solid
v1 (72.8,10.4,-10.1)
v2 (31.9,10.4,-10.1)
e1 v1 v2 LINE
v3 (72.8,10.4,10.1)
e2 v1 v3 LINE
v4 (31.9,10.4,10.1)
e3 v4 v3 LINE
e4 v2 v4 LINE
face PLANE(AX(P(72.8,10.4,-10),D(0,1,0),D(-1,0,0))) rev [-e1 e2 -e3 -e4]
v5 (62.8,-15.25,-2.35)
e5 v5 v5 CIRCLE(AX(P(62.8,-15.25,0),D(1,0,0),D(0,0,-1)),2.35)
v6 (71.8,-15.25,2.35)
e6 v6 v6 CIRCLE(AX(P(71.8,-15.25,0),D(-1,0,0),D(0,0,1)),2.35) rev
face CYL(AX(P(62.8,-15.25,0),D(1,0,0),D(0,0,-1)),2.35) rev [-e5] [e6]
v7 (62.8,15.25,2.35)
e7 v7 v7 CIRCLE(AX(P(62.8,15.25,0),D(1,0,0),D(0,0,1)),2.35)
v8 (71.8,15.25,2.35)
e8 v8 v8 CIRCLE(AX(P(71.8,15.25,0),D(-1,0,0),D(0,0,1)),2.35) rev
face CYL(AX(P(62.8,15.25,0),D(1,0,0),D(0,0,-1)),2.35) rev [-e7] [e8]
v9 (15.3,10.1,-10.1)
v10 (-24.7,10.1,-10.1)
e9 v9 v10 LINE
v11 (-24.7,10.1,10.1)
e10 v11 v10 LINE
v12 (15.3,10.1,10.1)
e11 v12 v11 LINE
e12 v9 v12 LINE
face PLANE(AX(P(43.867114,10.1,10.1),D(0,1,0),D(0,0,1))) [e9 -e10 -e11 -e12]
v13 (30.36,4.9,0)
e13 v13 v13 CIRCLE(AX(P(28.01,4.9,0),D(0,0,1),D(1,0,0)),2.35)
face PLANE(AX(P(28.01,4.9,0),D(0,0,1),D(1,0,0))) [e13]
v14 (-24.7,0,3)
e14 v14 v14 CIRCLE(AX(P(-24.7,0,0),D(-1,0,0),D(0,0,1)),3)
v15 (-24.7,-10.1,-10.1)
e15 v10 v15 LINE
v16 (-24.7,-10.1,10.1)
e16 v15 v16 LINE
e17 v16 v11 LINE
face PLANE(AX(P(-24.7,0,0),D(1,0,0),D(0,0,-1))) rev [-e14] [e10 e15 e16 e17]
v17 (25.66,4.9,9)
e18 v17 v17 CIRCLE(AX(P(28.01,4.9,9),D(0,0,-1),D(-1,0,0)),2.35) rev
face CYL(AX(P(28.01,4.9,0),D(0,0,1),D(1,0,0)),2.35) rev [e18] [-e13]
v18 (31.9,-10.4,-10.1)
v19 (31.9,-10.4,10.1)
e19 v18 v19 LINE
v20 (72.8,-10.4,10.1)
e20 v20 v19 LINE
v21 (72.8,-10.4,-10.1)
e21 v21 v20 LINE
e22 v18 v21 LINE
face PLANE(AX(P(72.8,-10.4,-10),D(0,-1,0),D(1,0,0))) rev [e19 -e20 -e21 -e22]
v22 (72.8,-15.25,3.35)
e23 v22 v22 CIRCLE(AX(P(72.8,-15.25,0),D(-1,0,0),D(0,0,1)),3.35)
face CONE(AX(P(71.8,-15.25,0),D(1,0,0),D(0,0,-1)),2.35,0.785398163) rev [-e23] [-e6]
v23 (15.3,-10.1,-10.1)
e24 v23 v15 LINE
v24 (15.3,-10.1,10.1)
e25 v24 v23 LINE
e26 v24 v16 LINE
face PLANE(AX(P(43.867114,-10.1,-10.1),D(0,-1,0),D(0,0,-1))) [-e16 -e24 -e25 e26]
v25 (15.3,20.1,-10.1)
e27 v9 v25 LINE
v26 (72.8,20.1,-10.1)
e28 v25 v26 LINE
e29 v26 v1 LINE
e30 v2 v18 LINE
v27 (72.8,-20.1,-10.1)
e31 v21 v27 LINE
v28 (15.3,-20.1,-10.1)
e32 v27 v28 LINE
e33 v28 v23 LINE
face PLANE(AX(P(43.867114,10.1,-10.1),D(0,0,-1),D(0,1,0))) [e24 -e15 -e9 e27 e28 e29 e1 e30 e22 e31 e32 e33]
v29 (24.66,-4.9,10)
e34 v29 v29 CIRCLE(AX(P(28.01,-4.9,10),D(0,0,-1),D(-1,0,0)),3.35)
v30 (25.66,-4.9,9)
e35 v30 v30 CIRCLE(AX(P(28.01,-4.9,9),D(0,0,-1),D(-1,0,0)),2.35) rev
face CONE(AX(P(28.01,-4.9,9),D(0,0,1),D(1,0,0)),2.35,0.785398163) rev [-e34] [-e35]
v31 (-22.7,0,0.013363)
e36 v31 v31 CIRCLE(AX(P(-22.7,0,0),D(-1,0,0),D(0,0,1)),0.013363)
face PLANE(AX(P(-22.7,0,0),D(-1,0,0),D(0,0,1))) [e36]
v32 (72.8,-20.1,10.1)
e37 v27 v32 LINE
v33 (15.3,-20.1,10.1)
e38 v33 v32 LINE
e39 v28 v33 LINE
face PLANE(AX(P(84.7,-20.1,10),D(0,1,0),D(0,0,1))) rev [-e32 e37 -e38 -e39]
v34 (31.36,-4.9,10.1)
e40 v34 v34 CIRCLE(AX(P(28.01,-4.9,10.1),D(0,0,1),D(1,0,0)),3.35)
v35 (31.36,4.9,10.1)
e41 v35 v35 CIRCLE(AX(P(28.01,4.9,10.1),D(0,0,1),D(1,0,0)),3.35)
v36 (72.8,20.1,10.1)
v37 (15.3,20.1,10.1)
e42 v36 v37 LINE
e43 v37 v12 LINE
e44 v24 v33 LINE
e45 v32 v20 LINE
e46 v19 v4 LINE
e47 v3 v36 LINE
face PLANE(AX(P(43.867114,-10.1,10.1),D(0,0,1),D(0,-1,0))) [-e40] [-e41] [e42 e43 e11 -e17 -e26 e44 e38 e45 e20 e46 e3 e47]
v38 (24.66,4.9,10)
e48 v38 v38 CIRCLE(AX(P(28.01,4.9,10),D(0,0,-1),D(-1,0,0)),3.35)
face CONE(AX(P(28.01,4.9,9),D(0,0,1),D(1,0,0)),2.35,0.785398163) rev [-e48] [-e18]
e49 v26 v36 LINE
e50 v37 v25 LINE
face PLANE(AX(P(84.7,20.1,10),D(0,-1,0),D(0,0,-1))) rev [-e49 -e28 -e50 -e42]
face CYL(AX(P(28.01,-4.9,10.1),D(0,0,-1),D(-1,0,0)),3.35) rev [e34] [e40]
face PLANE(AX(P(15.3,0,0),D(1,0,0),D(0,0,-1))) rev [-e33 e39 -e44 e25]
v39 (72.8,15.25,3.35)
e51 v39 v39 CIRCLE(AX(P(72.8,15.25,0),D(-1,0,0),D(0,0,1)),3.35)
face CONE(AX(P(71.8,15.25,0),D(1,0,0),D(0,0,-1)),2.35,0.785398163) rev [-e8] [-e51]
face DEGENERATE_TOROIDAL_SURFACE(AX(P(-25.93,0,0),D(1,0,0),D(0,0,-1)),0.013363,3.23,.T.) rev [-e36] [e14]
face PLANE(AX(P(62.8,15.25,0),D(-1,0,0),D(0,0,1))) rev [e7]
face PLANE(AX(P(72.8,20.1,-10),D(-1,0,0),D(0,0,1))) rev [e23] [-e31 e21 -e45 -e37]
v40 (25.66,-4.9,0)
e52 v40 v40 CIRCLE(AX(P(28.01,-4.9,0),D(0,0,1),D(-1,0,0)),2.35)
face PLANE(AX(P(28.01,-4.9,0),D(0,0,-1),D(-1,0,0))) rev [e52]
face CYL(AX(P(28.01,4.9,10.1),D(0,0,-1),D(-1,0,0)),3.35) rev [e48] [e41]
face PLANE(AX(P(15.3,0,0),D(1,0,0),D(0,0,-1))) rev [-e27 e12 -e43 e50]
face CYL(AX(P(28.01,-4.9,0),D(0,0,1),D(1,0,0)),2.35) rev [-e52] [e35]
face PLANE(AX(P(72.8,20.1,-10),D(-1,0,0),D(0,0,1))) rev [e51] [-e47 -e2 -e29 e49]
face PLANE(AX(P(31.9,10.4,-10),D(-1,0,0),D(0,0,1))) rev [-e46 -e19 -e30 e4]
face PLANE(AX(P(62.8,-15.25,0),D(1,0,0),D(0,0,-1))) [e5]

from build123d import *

# Parameters (mm, degrees)
SKETCH1_W           = 20
SKETCH1_H           = 20
BOSS_EXTRUDE1_DEPTH = 20
SKETCH2_W           = 20
SKETCH2_H           = 40.2
BOSS_EXTRUDE2_DEPTH = 64.7
SKETCH3_W           = 40.9
SKETCH3_H           = 20.8
CUT_EXTRUDE1_DEPTH  = 90.320210479
SKETCH4_W           = 11.9
SKETCH4_H           = 40.2
CUT_EXTRUDE2_DEPTH  = 90.320210479
SKETCH5_R           = 2.35
CUT_EXTRUDE3_DEPTH  = 10
SKETCH6_R           = 2.35
CUT_EXTRUDE4_DEPTH  = 10
CHAMFER1_SIZE       = 1
SKETCH7_W           = 20
SKETCH7_H           = 10.1
BOSS_EXTRUDE4_DEPTH = 4.7
SKETCH9_W           = 20
SKETCH9_H           = 20
BOSS_EXTRUDE5_DEPTH = 24.7
SKETCH10_R          = 3
CUT_EXTRUDE5_DEPTH  = 2
FILLET1_R           = 3.23
SKETCH11_W          = 20.2
SKETCH11_H          = 20.2
SKETCH11_W_2        = 20
SKETCH11_H_2        = 20
BOSS_EXTRUDE6_DEPTH = 40
SKETCH12_R          = 3.35
BOSS_EXTRUDE7_DEPTH = 0.1
BOSS_EXTRUDE8_DEPTH = 0.1


with BuildPart() as part:
    # Sketch1 → Boss-Extrude1 (new body)
    with BuildSketch(Plane(origin=(0, 0, 0), x_dir=(0, 0, -1), z_dir=(1, 0, 0))):
        Rectangle(SKETCH1_W, SKETCH1_H)
    extrude(amount=BOSS_EXTRUDE1_DEPTH)

    # Sketch2 → Boss-Extrude2 (add)
    with BuildSketch(Plane(origin=(20, 0, 0), x_dir=(0, 0, -1), z_dir=(1, 0, 0))):
        Rectangle(SKETCH2_W, SKETCH2_H)
    extrude(amount=BOSS_EXTRUDE2_DEPTH)

    # Sketch3 → Cut-Extrude1 (cut, through all)
    with BuildSketch(Plane.XY.offset(10)):
        with Locations((52.35, 0)):
            Rectangle(SKETCH3_W, SKETCH3_H)
    extrude(amount=-CUT_EXTRUDE1_DEPTH, mode=Mode.SUBTRACT)

    # Sketch4 → Cut-Extrude2 (cut, through all)
    with BuildSketch(Plane.XY.offset(10)):
        with Locations((78.75, 0)):
            Rectangle(SKETCH4_W, SKETCH4_H)
    extrude(amount=-CUT_EXTRUDE2_DEPTH, mode=Mode.SUBTRACT)

    # Sketch5 → Cut-Extrude3 (cut)
    with BuildSketch(Plane.XY.offset(10)):
        with Locations((28.01, 4.9)):
            Circle(SKETCH5_R)
        with Locations(Location((28.01, -4.9, 0), (0, 0, 180))):
            Circle(SKETCH5_R)
    extrude(amount=-CUT_EXTRUDE3_DEPTH, mode=Mode.SUBTRACT)

    # Sketch6 → Cut-Extrude4 (cut)
    with BuildSketch(Plane(origin=(72.8, 0, 0), x_dir=(0, 0, -1), z_dir=(1, 0, 0))):
        with Locations((0, -15.25)):
            Circle(SKETCH6_R)
        with Locations(Location((0, 15.25, 0), (0, 0, 180))):
            Circle(SKETCH6_R)
    extrude(amount=-CUT_EXTRUDE4_DEPTH, mode=Mode.SUBTRACT)

    # Chamfer1
    chamfer1_edges = [part.edges().sort_by_distance(p)[0] for p in [
        (25.66, 4.9, 10),
        (30.36, -4.9, 10),
        (72.8, -15.25, 2.35),
        (72.8, 15.25, -2.35),
    ]]
    chamfer(chamfer1_edges, length=CHAMFER1_SIZE)

    # Sketch7 → Boss-Extrude4 (add)
    with BuildSketch(Plane.ZY.offset(-20)):
        with Locations((0, 15.05)):
            Rectangle(SKETCH7_W, SKETCH7_H)
        with Locations((0, -15.05)):
            Rectangle(SKETCH7_W, SKETCH7_H)
    extrude(amount=BOSS_EXTRUDE4_DEPTH)

    # Sketch9 → Boss-Extrude5 (add)
    with BuildSketch(Plane.ZY):
        Rectangle(SKETCH9_W, SKETCH9_H)
    extrude(amount=BOSS_EXTRUDE5_DEPTH)

    # Sketch10 → Cut-Extrude5 (cut)
    with BuildSketch(Plane.ZY.offset(24.7)):
        Circle(SKETCH10_R)
    extrude(amount=-CUT_EXTRUDE5_DEPTH, mode=Mode.SUBTRACT)

    # Fillet1
    # the kernel refuses this fillet: 3.23 mm, written as the material it adds along each edge
    with BuildSketch(Plane(origin=(-22.7, 0, 0), x_dir=(0, 0, 1), z_dir=(0, -1, 0))) as fillet1_piece_1:
        with BuildLine():
            CenterArc((0.013363095, 3.23), FILLET1_R, 270, 67.616447755)
            Line((0.013363095, 0), (0.013363095, -0.0646))
            Line((0.013363095, -0.0646), (3, -0.0646))
            Line((3, -0.0646), (3.0646, 0))
            ThreePointArc((3.0646, 0), (3.0646, 1), (3.059732738, 1.9754))
            Line((3.059732738, 1.9754), (3, 2))
        make_face()
    revolve(axis=Axis((-22.7, 0, 0), (-1, 0, 0)))

    # Sketch11 → Boss-Extrude6 (add)
    with BuildSketch(Plane.ZY.offset(24.7)):
        Rectangle(SKETCH11_W, SKETCH11_H)
        Rectangle(SKETCH11_W_2, SKETCH11_H_2, mode=Mode.SUBTRACT)
    extrude(amount=-BOSS_EXTRUDE6_DEPTH)

    # Sketch12 → Boss-Extrude7 (add)
    with BuildSketch(Plane.XY.offset(10)):
        Polygon((72.8, 20.1), (15.3, 20.1), (15.3, -20.1), (72.8, -20.1), (72.8, -10.4), (31.9, -10.4), (31.9, 10.4), (72.8, 10.4), align=None)
        with Locations(Location((28.01, 4.9, 0), (0, 0, 180))):
            Circle(SKETCH12_R, mode=Mode.SUBTRACT)
        with Locations(Location((28.01, -4.9, 0), (0, 0, 180))):
            Circle(SKETCH12_R, mode=Mode.SUBTRACT)
    extrude(amount=BOSS_EXTRUDE7_DEPTH)

    # Sketch13 → Boss-Extrude8 (add)
    with BuildSketch(Plane(origin=(0, 0, -10), x_dir=(-1, 0, 0), z_dir=(0, 0, -1))):
        Polygon((-72.8, -20.1), (-15.3, -20.1), (-15.3, 20.1), (-72.8, 20.1), (-72.8, 10.4), (-31.9, 10.4), (-31.9, -10.4), (-72.8, -10.4), align=None)
    extrude(amount=BOSS_EXTRUDE8_DEPTH)


solid = part.part
